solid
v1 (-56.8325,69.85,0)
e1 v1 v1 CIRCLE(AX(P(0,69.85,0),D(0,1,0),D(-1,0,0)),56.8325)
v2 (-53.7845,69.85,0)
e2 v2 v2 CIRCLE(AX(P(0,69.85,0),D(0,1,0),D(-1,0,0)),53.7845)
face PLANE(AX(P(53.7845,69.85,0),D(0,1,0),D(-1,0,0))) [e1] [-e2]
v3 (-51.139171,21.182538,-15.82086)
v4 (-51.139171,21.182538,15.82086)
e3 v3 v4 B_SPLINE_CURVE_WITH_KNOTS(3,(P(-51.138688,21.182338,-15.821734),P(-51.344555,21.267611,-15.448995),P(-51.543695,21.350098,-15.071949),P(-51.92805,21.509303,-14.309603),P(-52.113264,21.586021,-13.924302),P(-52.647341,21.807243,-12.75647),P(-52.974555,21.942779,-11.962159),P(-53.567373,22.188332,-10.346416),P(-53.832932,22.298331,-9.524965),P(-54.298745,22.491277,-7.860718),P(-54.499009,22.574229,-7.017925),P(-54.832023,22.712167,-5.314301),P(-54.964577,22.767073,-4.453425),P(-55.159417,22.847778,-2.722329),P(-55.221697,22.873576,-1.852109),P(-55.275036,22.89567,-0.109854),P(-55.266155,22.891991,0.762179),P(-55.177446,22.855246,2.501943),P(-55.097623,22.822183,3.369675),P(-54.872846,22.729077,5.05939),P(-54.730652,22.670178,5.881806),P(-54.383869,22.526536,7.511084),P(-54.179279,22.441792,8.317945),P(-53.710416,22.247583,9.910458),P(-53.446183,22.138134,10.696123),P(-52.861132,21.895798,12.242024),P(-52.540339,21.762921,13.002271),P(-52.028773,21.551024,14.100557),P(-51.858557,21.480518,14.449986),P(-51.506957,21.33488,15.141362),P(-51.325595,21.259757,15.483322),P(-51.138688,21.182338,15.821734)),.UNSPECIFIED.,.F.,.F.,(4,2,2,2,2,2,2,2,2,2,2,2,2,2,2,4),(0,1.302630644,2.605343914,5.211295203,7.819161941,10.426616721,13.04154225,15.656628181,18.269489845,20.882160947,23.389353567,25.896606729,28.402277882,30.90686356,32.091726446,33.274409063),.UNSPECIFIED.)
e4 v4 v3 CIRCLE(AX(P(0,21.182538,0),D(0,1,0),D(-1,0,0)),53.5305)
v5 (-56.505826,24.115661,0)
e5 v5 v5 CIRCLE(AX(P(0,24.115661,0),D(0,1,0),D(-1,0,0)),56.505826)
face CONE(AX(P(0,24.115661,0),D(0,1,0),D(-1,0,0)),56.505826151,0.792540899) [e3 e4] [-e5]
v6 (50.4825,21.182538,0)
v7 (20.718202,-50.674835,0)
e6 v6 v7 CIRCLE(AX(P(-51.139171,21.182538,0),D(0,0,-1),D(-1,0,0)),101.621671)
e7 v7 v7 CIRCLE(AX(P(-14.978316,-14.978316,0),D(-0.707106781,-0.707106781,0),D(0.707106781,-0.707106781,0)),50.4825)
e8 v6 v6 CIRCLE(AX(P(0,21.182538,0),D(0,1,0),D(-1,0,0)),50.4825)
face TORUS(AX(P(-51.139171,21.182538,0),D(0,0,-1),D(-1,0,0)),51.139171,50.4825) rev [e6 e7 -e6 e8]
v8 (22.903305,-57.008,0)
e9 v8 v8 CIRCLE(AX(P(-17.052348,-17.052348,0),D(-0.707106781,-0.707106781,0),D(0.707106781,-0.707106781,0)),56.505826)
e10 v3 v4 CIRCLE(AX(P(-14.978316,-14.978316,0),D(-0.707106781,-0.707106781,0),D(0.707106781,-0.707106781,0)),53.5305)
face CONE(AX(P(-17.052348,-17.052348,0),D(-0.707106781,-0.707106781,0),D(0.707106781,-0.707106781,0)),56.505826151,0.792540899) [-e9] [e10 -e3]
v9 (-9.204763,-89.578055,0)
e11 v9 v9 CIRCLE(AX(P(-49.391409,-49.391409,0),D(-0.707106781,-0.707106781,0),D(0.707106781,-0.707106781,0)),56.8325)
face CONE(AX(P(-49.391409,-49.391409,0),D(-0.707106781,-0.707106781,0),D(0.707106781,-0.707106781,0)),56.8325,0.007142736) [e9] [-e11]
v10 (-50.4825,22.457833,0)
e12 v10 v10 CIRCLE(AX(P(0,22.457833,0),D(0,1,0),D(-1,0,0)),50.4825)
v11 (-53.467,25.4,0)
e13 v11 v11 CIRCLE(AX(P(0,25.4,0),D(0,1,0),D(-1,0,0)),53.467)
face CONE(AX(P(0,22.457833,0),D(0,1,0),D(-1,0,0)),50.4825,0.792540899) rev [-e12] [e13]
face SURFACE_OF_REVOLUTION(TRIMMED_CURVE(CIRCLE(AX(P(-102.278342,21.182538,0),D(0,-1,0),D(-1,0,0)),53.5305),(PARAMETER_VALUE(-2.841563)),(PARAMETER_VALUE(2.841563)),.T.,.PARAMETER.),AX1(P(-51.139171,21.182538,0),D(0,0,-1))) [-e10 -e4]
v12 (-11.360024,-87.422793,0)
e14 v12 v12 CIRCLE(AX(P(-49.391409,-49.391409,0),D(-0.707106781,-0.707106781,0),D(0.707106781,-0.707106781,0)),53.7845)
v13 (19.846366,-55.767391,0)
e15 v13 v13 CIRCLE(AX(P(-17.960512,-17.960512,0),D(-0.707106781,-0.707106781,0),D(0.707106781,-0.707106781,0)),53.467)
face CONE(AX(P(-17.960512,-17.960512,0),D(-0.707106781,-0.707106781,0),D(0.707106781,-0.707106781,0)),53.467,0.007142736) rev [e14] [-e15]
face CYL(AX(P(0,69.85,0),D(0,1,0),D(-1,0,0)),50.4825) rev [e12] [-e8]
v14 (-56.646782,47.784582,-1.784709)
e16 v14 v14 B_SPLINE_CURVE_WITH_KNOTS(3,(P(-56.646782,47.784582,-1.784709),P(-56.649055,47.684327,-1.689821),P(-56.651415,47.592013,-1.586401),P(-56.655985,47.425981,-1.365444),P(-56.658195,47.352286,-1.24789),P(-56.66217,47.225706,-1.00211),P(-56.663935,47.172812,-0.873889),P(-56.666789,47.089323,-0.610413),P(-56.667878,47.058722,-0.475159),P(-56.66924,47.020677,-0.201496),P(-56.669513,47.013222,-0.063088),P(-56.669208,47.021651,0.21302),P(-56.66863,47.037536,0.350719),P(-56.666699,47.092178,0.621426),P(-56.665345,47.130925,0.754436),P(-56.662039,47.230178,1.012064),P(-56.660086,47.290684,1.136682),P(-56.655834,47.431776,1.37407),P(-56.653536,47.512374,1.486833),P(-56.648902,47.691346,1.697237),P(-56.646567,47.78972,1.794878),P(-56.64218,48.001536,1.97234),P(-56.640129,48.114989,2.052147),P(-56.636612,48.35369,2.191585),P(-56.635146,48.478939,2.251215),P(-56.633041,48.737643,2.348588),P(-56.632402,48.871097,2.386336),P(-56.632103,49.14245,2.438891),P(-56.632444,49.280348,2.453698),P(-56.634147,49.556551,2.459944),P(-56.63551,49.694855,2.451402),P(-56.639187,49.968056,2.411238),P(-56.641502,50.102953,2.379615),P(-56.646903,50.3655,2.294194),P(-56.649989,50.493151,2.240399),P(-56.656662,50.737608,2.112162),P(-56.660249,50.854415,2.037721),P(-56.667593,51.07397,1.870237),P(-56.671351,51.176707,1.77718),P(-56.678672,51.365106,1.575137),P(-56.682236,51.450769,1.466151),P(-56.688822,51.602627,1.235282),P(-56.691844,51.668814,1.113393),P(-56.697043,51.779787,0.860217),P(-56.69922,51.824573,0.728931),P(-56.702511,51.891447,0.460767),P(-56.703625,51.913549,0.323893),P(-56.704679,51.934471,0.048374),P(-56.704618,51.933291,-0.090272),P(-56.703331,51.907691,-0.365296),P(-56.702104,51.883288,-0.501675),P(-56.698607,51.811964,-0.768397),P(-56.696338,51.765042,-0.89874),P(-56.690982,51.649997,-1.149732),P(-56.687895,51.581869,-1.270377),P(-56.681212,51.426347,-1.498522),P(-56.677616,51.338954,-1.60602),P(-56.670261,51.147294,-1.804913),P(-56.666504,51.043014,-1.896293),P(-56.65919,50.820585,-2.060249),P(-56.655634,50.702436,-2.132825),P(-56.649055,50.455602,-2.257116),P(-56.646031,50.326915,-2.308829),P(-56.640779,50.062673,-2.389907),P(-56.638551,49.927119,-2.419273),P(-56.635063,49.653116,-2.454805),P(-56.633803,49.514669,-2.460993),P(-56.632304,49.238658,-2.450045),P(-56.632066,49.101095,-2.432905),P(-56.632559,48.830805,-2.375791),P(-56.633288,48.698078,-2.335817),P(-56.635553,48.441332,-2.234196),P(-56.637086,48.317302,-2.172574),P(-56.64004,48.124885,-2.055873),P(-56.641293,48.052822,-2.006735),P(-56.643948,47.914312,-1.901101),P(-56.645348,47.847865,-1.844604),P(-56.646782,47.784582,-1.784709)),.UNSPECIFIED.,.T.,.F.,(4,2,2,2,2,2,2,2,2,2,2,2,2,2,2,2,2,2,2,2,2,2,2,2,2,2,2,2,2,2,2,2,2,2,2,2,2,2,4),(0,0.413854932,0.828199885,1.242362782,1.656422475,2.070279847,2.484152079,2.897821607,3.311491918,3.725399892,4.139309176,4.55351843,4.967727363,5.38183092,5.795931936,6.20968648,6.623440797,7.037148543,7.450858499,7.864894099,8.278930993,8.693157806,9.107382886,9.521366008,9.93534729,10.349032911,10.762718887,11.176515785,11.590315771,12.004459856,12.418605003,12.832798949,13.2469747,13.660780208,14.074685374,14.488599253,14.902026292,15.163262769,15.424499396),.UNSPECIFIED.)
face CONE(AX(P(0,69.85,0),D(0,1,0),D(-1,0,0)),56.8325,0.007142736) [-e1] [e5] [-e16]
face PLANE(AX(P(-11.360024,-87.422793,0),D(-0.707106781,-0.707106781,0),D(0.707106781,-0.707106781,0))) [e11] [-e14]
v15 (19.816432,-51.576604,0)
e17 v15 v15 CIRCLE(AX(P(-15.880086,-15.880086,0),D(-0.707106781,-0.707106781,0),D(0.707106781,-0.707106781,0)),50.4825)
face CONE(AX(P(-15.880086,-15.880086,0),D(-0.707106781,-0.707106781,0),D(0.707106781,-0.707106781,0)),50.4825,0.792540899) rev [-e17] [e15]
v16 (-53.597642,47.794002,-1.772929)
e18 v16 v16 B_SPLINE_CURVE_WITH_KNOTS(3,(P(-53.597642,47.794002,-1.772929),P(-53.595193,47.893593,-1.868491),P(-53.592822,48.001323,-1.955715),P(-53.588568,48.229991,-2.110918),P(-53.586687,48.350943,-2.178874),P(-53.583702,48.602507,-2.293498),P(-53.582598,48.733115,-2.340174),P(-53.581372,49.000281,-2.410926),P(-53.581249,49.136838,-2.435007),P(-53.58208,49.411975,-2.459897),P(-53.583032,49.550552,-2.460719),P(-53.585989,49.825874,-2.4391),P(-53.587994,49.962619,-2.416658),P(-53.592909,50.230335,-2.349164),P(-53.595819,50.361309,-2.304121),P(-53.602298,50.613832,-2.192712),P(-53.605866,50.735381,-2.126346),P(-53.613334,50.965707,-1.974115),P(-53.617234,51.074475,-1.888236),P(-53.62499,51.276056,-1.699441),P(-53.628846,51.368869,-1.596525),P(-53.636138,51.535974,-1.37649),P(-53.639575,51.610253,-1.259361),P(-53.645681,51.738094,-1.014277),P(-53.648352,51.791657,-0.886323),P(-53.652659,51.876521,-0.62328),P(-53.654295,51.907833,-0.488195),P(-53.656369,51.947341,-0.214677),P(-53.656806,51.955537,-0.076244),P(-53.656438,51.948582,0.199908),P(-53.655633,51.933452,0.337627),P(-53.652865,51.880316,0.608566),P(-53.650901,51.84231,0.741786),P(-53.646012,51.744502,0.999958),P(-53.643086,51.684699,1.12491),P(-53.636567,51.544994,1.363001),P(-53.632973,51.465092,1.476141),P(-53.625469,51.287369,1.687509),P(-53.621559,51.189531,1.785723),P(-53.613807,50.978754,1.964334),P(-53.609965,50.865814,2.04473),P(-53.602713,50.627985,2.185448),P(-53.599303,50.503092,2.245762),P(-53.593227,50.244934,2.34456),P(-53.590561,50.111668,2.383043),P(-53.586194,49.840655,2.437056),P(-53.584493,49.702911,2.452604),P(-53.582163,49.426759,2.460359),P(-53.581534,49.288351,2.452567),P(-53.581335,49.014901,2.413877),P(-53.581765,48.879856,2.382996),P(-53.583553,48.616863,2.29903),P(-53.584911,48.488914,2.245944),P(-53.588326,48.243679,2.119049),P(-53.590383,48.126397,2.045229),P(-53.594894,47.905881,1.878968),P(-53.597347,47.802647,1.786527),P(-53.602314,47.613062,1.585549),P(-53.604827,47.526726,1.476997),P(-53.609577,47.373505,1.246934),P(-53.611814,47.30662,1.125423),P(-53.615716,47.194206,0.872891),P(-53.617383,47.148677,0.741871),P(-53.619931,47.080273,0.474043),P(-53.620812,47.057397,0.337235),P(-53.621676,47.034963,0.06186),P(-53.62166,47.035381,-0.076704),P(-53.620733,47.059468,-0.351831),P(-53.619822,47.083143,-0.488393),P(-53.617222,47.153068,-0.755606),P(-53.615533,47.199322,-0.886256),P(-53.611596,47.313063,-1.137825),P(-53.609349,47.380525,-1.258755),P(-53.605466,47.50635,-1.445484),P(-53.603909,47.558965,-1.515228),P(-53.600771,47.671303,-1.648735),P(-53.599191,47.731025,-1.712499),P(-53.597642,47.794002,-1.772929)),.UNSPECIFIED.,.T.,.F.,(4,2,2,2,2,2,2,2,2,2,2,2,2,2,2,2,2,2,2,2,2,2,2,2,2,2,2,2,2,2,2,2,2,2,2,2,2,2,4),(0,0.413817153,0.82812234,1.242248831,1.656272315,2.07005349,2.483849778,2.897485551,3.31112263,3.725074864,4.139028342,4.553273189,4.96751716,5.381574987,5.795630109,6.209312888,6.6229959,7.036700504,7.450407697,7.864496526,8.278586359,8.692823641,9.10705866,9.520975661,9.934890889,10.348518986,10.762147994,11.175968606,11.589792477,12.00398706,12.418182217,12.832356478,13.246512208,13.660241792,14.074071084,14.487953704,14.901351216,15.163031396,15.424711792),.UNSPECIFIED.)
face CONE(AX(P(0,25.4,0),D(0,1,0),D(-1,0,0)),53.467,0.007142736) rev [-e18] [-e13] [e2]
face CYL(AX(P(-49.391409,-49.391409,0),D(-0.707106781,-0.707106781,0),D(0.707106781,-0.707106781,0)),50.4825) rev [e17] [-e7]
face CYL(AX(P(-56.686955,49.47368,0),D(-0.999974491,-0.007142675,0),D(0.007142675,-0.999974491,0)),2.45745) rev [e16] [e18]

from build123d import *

# Parameters (mm, degrees)
SWEEP1_OUTLINE_R                 = 50.4825
SWEEP1_ANGLE                     = 45
F_10_0_1935_DIAMETER_HOLE1_D     = 4.9149
F_10_0_1935_DIAMETER_HOLE1_DEPTH = 76.2
F_10_0_1935_DIAMETER_HOLE1_TIP   = 1.476584928


# Read off the part's stored shape, not the designer's step: Sweep1
with BuildPart() as part:
    # Sketch1 → Revolve1 (revolve)
    with BuildSketch(Plane.XY):
        Polygon((-11.360023993, -87.422793339), (-9.204762524, -89.578054808), (22.903305281, -57.008000415), (22.873463107, -52.830095994), (20.718201637, -50.674834525), (19.81643184, -51.576604322), (19.846366028, -55.767390512), align=None)
    revolve(axis=Axis((-49.391408666, -49.391408666, 0), (0.707106781186549, 0.707106781186546, 0)))

    # Sketch2 → Revolve2 (revolve)
    with BuildSketch(Plane(origin=(0, 0, 0), x_dir=(-1, 0, 0), z_dir=(0, 0, -1)), mode=Mode.PRIVATE) as revolve2_sk:
        Polygon((-56.505826151, 24.1156612), (-53.5305, 21.182538256), (-50.4825, 21.182538256), (-50.4825, 22.457833333), (-53.467, 25.4), (-53.7845, 69.85), (-56.8325, 69.85), align=None)
    revolve(revolve2_sk.sketch.rotate(Axis((0, 69.85, 0), (0, -1, 0)), 180), axis=Axis((0, 69.85, 0), (0, -1, 0)))

    # Sweep1 outline → Sweep1 (revolve)
    with BuildSketch(Plane(origin=(-51.139171144, 21.182538256, 0), x_dir=(0.7071067811865458, -0.7071067811865492, 0), z_dir=(-0.7071067811865492, -0.7071067811865458, 0))):
        with BuildLine():
            add(Edge.make_bspline(
                [(0, -15.820859805), (3.386630847, -26.767767661), (10.25130148, -38.496554105), (21.767653092, -48.823978651), (37.04613395, -53.530499997), (58.423945129, -53.530500001), (65.508765494, -52.291102822), (71.965878454, -49.951324198), (77.591040871, -46.913712001), (89.454406147, -38.379551501), (96.226005165, -31.333524518), (101.848697911, -22.017553206), (107.472700853, 3.04e-07), (101.848697636, 22.017553663), (96.226004942, 31.333524749), (89.454406032, 38.379551584), (77.591040819, 46.913712039), (71.965878332, 49.951324264), (65.508765283, 52.291102899), (58.42394482, 53.530500055), (37.046133615, 53.530499893), (21.767652893, 48.823978477), (10.2513014, 38.496553967), (3.386630828, 26.767767599), (0, 15.820859805)],
                knots=[7.875906621, 7.875906621, 7.875906621, 7.875906621, 7.875906621, 7.875906621, 9.124748328, 9.124748328, 9.124748328, 9.124748328, 9.770281969, 9.770281969, 9.770281969, 9.770281969, 10.71746965, 10.71746965, 10.71746965, 11.664657316, 11.664657316, 11.664657316, 11.664657316, 12.310190963, 12.310190963, 12.310190963, 12.310190963, 13.559032663, 13.559032663, 13.559032663, 13.559032663, 13.559032663, 13.559032663], degree=5, weights=[1, 1, 0.991757982, 0.985412067, 1, 1, 0.999839694, 1.000222797, 1, 1, 0.999082466, 0.99680945, 1.00319055, 0.99680945, 0.999082467, 1, 1, 1.000222797, 0.999839694, 1, 1, 0.985412067, 0.991757982, 1, 1]))
            Line((0, 15.820859805), (0, -15.820859805))
        make_face()
        with Locations((51.139171144, 0)):
            Circle(SWEEP1_OUTLINE_R, mode=Mode.SUBTRACT)
    revolve(axis=Axis((-51.139171144, 21.182538256, 0), (0, 0, 1)), revolution_arc=SWEEP1_ANGLE)

    # #10 (0.1935) Diameter Hole1
    with Locations(Plane(origin=(-56.686954854, 49.473679541, 0), x_dir=(0.007142674934, -0.999974490772, 0), z_dir=(-0.999974490772, -0.007142674934, 0))):
        with Locations((0, 0)):
            Hole(F_10_0_1935_DIAMETER_HOLE1_D / 2, depth=F_10_0_1935_DIAMETER_HOLE1_DEPTH)
            with Locations((0, 0, -(F_10_0_1935_DIAMETER_HOLE1_DEPTH + F_10_0_1935_DIAMETER_HOLE1_TIP / 2))):  # 118° drill point
                Cone(0, F_10_0_1935_DIAMETER_HOLE1_D / 2, F_10_0_1935_DIAMETER_HOLE1_TIP, mode=Mode.SUBTRACT)


solid = part.part
